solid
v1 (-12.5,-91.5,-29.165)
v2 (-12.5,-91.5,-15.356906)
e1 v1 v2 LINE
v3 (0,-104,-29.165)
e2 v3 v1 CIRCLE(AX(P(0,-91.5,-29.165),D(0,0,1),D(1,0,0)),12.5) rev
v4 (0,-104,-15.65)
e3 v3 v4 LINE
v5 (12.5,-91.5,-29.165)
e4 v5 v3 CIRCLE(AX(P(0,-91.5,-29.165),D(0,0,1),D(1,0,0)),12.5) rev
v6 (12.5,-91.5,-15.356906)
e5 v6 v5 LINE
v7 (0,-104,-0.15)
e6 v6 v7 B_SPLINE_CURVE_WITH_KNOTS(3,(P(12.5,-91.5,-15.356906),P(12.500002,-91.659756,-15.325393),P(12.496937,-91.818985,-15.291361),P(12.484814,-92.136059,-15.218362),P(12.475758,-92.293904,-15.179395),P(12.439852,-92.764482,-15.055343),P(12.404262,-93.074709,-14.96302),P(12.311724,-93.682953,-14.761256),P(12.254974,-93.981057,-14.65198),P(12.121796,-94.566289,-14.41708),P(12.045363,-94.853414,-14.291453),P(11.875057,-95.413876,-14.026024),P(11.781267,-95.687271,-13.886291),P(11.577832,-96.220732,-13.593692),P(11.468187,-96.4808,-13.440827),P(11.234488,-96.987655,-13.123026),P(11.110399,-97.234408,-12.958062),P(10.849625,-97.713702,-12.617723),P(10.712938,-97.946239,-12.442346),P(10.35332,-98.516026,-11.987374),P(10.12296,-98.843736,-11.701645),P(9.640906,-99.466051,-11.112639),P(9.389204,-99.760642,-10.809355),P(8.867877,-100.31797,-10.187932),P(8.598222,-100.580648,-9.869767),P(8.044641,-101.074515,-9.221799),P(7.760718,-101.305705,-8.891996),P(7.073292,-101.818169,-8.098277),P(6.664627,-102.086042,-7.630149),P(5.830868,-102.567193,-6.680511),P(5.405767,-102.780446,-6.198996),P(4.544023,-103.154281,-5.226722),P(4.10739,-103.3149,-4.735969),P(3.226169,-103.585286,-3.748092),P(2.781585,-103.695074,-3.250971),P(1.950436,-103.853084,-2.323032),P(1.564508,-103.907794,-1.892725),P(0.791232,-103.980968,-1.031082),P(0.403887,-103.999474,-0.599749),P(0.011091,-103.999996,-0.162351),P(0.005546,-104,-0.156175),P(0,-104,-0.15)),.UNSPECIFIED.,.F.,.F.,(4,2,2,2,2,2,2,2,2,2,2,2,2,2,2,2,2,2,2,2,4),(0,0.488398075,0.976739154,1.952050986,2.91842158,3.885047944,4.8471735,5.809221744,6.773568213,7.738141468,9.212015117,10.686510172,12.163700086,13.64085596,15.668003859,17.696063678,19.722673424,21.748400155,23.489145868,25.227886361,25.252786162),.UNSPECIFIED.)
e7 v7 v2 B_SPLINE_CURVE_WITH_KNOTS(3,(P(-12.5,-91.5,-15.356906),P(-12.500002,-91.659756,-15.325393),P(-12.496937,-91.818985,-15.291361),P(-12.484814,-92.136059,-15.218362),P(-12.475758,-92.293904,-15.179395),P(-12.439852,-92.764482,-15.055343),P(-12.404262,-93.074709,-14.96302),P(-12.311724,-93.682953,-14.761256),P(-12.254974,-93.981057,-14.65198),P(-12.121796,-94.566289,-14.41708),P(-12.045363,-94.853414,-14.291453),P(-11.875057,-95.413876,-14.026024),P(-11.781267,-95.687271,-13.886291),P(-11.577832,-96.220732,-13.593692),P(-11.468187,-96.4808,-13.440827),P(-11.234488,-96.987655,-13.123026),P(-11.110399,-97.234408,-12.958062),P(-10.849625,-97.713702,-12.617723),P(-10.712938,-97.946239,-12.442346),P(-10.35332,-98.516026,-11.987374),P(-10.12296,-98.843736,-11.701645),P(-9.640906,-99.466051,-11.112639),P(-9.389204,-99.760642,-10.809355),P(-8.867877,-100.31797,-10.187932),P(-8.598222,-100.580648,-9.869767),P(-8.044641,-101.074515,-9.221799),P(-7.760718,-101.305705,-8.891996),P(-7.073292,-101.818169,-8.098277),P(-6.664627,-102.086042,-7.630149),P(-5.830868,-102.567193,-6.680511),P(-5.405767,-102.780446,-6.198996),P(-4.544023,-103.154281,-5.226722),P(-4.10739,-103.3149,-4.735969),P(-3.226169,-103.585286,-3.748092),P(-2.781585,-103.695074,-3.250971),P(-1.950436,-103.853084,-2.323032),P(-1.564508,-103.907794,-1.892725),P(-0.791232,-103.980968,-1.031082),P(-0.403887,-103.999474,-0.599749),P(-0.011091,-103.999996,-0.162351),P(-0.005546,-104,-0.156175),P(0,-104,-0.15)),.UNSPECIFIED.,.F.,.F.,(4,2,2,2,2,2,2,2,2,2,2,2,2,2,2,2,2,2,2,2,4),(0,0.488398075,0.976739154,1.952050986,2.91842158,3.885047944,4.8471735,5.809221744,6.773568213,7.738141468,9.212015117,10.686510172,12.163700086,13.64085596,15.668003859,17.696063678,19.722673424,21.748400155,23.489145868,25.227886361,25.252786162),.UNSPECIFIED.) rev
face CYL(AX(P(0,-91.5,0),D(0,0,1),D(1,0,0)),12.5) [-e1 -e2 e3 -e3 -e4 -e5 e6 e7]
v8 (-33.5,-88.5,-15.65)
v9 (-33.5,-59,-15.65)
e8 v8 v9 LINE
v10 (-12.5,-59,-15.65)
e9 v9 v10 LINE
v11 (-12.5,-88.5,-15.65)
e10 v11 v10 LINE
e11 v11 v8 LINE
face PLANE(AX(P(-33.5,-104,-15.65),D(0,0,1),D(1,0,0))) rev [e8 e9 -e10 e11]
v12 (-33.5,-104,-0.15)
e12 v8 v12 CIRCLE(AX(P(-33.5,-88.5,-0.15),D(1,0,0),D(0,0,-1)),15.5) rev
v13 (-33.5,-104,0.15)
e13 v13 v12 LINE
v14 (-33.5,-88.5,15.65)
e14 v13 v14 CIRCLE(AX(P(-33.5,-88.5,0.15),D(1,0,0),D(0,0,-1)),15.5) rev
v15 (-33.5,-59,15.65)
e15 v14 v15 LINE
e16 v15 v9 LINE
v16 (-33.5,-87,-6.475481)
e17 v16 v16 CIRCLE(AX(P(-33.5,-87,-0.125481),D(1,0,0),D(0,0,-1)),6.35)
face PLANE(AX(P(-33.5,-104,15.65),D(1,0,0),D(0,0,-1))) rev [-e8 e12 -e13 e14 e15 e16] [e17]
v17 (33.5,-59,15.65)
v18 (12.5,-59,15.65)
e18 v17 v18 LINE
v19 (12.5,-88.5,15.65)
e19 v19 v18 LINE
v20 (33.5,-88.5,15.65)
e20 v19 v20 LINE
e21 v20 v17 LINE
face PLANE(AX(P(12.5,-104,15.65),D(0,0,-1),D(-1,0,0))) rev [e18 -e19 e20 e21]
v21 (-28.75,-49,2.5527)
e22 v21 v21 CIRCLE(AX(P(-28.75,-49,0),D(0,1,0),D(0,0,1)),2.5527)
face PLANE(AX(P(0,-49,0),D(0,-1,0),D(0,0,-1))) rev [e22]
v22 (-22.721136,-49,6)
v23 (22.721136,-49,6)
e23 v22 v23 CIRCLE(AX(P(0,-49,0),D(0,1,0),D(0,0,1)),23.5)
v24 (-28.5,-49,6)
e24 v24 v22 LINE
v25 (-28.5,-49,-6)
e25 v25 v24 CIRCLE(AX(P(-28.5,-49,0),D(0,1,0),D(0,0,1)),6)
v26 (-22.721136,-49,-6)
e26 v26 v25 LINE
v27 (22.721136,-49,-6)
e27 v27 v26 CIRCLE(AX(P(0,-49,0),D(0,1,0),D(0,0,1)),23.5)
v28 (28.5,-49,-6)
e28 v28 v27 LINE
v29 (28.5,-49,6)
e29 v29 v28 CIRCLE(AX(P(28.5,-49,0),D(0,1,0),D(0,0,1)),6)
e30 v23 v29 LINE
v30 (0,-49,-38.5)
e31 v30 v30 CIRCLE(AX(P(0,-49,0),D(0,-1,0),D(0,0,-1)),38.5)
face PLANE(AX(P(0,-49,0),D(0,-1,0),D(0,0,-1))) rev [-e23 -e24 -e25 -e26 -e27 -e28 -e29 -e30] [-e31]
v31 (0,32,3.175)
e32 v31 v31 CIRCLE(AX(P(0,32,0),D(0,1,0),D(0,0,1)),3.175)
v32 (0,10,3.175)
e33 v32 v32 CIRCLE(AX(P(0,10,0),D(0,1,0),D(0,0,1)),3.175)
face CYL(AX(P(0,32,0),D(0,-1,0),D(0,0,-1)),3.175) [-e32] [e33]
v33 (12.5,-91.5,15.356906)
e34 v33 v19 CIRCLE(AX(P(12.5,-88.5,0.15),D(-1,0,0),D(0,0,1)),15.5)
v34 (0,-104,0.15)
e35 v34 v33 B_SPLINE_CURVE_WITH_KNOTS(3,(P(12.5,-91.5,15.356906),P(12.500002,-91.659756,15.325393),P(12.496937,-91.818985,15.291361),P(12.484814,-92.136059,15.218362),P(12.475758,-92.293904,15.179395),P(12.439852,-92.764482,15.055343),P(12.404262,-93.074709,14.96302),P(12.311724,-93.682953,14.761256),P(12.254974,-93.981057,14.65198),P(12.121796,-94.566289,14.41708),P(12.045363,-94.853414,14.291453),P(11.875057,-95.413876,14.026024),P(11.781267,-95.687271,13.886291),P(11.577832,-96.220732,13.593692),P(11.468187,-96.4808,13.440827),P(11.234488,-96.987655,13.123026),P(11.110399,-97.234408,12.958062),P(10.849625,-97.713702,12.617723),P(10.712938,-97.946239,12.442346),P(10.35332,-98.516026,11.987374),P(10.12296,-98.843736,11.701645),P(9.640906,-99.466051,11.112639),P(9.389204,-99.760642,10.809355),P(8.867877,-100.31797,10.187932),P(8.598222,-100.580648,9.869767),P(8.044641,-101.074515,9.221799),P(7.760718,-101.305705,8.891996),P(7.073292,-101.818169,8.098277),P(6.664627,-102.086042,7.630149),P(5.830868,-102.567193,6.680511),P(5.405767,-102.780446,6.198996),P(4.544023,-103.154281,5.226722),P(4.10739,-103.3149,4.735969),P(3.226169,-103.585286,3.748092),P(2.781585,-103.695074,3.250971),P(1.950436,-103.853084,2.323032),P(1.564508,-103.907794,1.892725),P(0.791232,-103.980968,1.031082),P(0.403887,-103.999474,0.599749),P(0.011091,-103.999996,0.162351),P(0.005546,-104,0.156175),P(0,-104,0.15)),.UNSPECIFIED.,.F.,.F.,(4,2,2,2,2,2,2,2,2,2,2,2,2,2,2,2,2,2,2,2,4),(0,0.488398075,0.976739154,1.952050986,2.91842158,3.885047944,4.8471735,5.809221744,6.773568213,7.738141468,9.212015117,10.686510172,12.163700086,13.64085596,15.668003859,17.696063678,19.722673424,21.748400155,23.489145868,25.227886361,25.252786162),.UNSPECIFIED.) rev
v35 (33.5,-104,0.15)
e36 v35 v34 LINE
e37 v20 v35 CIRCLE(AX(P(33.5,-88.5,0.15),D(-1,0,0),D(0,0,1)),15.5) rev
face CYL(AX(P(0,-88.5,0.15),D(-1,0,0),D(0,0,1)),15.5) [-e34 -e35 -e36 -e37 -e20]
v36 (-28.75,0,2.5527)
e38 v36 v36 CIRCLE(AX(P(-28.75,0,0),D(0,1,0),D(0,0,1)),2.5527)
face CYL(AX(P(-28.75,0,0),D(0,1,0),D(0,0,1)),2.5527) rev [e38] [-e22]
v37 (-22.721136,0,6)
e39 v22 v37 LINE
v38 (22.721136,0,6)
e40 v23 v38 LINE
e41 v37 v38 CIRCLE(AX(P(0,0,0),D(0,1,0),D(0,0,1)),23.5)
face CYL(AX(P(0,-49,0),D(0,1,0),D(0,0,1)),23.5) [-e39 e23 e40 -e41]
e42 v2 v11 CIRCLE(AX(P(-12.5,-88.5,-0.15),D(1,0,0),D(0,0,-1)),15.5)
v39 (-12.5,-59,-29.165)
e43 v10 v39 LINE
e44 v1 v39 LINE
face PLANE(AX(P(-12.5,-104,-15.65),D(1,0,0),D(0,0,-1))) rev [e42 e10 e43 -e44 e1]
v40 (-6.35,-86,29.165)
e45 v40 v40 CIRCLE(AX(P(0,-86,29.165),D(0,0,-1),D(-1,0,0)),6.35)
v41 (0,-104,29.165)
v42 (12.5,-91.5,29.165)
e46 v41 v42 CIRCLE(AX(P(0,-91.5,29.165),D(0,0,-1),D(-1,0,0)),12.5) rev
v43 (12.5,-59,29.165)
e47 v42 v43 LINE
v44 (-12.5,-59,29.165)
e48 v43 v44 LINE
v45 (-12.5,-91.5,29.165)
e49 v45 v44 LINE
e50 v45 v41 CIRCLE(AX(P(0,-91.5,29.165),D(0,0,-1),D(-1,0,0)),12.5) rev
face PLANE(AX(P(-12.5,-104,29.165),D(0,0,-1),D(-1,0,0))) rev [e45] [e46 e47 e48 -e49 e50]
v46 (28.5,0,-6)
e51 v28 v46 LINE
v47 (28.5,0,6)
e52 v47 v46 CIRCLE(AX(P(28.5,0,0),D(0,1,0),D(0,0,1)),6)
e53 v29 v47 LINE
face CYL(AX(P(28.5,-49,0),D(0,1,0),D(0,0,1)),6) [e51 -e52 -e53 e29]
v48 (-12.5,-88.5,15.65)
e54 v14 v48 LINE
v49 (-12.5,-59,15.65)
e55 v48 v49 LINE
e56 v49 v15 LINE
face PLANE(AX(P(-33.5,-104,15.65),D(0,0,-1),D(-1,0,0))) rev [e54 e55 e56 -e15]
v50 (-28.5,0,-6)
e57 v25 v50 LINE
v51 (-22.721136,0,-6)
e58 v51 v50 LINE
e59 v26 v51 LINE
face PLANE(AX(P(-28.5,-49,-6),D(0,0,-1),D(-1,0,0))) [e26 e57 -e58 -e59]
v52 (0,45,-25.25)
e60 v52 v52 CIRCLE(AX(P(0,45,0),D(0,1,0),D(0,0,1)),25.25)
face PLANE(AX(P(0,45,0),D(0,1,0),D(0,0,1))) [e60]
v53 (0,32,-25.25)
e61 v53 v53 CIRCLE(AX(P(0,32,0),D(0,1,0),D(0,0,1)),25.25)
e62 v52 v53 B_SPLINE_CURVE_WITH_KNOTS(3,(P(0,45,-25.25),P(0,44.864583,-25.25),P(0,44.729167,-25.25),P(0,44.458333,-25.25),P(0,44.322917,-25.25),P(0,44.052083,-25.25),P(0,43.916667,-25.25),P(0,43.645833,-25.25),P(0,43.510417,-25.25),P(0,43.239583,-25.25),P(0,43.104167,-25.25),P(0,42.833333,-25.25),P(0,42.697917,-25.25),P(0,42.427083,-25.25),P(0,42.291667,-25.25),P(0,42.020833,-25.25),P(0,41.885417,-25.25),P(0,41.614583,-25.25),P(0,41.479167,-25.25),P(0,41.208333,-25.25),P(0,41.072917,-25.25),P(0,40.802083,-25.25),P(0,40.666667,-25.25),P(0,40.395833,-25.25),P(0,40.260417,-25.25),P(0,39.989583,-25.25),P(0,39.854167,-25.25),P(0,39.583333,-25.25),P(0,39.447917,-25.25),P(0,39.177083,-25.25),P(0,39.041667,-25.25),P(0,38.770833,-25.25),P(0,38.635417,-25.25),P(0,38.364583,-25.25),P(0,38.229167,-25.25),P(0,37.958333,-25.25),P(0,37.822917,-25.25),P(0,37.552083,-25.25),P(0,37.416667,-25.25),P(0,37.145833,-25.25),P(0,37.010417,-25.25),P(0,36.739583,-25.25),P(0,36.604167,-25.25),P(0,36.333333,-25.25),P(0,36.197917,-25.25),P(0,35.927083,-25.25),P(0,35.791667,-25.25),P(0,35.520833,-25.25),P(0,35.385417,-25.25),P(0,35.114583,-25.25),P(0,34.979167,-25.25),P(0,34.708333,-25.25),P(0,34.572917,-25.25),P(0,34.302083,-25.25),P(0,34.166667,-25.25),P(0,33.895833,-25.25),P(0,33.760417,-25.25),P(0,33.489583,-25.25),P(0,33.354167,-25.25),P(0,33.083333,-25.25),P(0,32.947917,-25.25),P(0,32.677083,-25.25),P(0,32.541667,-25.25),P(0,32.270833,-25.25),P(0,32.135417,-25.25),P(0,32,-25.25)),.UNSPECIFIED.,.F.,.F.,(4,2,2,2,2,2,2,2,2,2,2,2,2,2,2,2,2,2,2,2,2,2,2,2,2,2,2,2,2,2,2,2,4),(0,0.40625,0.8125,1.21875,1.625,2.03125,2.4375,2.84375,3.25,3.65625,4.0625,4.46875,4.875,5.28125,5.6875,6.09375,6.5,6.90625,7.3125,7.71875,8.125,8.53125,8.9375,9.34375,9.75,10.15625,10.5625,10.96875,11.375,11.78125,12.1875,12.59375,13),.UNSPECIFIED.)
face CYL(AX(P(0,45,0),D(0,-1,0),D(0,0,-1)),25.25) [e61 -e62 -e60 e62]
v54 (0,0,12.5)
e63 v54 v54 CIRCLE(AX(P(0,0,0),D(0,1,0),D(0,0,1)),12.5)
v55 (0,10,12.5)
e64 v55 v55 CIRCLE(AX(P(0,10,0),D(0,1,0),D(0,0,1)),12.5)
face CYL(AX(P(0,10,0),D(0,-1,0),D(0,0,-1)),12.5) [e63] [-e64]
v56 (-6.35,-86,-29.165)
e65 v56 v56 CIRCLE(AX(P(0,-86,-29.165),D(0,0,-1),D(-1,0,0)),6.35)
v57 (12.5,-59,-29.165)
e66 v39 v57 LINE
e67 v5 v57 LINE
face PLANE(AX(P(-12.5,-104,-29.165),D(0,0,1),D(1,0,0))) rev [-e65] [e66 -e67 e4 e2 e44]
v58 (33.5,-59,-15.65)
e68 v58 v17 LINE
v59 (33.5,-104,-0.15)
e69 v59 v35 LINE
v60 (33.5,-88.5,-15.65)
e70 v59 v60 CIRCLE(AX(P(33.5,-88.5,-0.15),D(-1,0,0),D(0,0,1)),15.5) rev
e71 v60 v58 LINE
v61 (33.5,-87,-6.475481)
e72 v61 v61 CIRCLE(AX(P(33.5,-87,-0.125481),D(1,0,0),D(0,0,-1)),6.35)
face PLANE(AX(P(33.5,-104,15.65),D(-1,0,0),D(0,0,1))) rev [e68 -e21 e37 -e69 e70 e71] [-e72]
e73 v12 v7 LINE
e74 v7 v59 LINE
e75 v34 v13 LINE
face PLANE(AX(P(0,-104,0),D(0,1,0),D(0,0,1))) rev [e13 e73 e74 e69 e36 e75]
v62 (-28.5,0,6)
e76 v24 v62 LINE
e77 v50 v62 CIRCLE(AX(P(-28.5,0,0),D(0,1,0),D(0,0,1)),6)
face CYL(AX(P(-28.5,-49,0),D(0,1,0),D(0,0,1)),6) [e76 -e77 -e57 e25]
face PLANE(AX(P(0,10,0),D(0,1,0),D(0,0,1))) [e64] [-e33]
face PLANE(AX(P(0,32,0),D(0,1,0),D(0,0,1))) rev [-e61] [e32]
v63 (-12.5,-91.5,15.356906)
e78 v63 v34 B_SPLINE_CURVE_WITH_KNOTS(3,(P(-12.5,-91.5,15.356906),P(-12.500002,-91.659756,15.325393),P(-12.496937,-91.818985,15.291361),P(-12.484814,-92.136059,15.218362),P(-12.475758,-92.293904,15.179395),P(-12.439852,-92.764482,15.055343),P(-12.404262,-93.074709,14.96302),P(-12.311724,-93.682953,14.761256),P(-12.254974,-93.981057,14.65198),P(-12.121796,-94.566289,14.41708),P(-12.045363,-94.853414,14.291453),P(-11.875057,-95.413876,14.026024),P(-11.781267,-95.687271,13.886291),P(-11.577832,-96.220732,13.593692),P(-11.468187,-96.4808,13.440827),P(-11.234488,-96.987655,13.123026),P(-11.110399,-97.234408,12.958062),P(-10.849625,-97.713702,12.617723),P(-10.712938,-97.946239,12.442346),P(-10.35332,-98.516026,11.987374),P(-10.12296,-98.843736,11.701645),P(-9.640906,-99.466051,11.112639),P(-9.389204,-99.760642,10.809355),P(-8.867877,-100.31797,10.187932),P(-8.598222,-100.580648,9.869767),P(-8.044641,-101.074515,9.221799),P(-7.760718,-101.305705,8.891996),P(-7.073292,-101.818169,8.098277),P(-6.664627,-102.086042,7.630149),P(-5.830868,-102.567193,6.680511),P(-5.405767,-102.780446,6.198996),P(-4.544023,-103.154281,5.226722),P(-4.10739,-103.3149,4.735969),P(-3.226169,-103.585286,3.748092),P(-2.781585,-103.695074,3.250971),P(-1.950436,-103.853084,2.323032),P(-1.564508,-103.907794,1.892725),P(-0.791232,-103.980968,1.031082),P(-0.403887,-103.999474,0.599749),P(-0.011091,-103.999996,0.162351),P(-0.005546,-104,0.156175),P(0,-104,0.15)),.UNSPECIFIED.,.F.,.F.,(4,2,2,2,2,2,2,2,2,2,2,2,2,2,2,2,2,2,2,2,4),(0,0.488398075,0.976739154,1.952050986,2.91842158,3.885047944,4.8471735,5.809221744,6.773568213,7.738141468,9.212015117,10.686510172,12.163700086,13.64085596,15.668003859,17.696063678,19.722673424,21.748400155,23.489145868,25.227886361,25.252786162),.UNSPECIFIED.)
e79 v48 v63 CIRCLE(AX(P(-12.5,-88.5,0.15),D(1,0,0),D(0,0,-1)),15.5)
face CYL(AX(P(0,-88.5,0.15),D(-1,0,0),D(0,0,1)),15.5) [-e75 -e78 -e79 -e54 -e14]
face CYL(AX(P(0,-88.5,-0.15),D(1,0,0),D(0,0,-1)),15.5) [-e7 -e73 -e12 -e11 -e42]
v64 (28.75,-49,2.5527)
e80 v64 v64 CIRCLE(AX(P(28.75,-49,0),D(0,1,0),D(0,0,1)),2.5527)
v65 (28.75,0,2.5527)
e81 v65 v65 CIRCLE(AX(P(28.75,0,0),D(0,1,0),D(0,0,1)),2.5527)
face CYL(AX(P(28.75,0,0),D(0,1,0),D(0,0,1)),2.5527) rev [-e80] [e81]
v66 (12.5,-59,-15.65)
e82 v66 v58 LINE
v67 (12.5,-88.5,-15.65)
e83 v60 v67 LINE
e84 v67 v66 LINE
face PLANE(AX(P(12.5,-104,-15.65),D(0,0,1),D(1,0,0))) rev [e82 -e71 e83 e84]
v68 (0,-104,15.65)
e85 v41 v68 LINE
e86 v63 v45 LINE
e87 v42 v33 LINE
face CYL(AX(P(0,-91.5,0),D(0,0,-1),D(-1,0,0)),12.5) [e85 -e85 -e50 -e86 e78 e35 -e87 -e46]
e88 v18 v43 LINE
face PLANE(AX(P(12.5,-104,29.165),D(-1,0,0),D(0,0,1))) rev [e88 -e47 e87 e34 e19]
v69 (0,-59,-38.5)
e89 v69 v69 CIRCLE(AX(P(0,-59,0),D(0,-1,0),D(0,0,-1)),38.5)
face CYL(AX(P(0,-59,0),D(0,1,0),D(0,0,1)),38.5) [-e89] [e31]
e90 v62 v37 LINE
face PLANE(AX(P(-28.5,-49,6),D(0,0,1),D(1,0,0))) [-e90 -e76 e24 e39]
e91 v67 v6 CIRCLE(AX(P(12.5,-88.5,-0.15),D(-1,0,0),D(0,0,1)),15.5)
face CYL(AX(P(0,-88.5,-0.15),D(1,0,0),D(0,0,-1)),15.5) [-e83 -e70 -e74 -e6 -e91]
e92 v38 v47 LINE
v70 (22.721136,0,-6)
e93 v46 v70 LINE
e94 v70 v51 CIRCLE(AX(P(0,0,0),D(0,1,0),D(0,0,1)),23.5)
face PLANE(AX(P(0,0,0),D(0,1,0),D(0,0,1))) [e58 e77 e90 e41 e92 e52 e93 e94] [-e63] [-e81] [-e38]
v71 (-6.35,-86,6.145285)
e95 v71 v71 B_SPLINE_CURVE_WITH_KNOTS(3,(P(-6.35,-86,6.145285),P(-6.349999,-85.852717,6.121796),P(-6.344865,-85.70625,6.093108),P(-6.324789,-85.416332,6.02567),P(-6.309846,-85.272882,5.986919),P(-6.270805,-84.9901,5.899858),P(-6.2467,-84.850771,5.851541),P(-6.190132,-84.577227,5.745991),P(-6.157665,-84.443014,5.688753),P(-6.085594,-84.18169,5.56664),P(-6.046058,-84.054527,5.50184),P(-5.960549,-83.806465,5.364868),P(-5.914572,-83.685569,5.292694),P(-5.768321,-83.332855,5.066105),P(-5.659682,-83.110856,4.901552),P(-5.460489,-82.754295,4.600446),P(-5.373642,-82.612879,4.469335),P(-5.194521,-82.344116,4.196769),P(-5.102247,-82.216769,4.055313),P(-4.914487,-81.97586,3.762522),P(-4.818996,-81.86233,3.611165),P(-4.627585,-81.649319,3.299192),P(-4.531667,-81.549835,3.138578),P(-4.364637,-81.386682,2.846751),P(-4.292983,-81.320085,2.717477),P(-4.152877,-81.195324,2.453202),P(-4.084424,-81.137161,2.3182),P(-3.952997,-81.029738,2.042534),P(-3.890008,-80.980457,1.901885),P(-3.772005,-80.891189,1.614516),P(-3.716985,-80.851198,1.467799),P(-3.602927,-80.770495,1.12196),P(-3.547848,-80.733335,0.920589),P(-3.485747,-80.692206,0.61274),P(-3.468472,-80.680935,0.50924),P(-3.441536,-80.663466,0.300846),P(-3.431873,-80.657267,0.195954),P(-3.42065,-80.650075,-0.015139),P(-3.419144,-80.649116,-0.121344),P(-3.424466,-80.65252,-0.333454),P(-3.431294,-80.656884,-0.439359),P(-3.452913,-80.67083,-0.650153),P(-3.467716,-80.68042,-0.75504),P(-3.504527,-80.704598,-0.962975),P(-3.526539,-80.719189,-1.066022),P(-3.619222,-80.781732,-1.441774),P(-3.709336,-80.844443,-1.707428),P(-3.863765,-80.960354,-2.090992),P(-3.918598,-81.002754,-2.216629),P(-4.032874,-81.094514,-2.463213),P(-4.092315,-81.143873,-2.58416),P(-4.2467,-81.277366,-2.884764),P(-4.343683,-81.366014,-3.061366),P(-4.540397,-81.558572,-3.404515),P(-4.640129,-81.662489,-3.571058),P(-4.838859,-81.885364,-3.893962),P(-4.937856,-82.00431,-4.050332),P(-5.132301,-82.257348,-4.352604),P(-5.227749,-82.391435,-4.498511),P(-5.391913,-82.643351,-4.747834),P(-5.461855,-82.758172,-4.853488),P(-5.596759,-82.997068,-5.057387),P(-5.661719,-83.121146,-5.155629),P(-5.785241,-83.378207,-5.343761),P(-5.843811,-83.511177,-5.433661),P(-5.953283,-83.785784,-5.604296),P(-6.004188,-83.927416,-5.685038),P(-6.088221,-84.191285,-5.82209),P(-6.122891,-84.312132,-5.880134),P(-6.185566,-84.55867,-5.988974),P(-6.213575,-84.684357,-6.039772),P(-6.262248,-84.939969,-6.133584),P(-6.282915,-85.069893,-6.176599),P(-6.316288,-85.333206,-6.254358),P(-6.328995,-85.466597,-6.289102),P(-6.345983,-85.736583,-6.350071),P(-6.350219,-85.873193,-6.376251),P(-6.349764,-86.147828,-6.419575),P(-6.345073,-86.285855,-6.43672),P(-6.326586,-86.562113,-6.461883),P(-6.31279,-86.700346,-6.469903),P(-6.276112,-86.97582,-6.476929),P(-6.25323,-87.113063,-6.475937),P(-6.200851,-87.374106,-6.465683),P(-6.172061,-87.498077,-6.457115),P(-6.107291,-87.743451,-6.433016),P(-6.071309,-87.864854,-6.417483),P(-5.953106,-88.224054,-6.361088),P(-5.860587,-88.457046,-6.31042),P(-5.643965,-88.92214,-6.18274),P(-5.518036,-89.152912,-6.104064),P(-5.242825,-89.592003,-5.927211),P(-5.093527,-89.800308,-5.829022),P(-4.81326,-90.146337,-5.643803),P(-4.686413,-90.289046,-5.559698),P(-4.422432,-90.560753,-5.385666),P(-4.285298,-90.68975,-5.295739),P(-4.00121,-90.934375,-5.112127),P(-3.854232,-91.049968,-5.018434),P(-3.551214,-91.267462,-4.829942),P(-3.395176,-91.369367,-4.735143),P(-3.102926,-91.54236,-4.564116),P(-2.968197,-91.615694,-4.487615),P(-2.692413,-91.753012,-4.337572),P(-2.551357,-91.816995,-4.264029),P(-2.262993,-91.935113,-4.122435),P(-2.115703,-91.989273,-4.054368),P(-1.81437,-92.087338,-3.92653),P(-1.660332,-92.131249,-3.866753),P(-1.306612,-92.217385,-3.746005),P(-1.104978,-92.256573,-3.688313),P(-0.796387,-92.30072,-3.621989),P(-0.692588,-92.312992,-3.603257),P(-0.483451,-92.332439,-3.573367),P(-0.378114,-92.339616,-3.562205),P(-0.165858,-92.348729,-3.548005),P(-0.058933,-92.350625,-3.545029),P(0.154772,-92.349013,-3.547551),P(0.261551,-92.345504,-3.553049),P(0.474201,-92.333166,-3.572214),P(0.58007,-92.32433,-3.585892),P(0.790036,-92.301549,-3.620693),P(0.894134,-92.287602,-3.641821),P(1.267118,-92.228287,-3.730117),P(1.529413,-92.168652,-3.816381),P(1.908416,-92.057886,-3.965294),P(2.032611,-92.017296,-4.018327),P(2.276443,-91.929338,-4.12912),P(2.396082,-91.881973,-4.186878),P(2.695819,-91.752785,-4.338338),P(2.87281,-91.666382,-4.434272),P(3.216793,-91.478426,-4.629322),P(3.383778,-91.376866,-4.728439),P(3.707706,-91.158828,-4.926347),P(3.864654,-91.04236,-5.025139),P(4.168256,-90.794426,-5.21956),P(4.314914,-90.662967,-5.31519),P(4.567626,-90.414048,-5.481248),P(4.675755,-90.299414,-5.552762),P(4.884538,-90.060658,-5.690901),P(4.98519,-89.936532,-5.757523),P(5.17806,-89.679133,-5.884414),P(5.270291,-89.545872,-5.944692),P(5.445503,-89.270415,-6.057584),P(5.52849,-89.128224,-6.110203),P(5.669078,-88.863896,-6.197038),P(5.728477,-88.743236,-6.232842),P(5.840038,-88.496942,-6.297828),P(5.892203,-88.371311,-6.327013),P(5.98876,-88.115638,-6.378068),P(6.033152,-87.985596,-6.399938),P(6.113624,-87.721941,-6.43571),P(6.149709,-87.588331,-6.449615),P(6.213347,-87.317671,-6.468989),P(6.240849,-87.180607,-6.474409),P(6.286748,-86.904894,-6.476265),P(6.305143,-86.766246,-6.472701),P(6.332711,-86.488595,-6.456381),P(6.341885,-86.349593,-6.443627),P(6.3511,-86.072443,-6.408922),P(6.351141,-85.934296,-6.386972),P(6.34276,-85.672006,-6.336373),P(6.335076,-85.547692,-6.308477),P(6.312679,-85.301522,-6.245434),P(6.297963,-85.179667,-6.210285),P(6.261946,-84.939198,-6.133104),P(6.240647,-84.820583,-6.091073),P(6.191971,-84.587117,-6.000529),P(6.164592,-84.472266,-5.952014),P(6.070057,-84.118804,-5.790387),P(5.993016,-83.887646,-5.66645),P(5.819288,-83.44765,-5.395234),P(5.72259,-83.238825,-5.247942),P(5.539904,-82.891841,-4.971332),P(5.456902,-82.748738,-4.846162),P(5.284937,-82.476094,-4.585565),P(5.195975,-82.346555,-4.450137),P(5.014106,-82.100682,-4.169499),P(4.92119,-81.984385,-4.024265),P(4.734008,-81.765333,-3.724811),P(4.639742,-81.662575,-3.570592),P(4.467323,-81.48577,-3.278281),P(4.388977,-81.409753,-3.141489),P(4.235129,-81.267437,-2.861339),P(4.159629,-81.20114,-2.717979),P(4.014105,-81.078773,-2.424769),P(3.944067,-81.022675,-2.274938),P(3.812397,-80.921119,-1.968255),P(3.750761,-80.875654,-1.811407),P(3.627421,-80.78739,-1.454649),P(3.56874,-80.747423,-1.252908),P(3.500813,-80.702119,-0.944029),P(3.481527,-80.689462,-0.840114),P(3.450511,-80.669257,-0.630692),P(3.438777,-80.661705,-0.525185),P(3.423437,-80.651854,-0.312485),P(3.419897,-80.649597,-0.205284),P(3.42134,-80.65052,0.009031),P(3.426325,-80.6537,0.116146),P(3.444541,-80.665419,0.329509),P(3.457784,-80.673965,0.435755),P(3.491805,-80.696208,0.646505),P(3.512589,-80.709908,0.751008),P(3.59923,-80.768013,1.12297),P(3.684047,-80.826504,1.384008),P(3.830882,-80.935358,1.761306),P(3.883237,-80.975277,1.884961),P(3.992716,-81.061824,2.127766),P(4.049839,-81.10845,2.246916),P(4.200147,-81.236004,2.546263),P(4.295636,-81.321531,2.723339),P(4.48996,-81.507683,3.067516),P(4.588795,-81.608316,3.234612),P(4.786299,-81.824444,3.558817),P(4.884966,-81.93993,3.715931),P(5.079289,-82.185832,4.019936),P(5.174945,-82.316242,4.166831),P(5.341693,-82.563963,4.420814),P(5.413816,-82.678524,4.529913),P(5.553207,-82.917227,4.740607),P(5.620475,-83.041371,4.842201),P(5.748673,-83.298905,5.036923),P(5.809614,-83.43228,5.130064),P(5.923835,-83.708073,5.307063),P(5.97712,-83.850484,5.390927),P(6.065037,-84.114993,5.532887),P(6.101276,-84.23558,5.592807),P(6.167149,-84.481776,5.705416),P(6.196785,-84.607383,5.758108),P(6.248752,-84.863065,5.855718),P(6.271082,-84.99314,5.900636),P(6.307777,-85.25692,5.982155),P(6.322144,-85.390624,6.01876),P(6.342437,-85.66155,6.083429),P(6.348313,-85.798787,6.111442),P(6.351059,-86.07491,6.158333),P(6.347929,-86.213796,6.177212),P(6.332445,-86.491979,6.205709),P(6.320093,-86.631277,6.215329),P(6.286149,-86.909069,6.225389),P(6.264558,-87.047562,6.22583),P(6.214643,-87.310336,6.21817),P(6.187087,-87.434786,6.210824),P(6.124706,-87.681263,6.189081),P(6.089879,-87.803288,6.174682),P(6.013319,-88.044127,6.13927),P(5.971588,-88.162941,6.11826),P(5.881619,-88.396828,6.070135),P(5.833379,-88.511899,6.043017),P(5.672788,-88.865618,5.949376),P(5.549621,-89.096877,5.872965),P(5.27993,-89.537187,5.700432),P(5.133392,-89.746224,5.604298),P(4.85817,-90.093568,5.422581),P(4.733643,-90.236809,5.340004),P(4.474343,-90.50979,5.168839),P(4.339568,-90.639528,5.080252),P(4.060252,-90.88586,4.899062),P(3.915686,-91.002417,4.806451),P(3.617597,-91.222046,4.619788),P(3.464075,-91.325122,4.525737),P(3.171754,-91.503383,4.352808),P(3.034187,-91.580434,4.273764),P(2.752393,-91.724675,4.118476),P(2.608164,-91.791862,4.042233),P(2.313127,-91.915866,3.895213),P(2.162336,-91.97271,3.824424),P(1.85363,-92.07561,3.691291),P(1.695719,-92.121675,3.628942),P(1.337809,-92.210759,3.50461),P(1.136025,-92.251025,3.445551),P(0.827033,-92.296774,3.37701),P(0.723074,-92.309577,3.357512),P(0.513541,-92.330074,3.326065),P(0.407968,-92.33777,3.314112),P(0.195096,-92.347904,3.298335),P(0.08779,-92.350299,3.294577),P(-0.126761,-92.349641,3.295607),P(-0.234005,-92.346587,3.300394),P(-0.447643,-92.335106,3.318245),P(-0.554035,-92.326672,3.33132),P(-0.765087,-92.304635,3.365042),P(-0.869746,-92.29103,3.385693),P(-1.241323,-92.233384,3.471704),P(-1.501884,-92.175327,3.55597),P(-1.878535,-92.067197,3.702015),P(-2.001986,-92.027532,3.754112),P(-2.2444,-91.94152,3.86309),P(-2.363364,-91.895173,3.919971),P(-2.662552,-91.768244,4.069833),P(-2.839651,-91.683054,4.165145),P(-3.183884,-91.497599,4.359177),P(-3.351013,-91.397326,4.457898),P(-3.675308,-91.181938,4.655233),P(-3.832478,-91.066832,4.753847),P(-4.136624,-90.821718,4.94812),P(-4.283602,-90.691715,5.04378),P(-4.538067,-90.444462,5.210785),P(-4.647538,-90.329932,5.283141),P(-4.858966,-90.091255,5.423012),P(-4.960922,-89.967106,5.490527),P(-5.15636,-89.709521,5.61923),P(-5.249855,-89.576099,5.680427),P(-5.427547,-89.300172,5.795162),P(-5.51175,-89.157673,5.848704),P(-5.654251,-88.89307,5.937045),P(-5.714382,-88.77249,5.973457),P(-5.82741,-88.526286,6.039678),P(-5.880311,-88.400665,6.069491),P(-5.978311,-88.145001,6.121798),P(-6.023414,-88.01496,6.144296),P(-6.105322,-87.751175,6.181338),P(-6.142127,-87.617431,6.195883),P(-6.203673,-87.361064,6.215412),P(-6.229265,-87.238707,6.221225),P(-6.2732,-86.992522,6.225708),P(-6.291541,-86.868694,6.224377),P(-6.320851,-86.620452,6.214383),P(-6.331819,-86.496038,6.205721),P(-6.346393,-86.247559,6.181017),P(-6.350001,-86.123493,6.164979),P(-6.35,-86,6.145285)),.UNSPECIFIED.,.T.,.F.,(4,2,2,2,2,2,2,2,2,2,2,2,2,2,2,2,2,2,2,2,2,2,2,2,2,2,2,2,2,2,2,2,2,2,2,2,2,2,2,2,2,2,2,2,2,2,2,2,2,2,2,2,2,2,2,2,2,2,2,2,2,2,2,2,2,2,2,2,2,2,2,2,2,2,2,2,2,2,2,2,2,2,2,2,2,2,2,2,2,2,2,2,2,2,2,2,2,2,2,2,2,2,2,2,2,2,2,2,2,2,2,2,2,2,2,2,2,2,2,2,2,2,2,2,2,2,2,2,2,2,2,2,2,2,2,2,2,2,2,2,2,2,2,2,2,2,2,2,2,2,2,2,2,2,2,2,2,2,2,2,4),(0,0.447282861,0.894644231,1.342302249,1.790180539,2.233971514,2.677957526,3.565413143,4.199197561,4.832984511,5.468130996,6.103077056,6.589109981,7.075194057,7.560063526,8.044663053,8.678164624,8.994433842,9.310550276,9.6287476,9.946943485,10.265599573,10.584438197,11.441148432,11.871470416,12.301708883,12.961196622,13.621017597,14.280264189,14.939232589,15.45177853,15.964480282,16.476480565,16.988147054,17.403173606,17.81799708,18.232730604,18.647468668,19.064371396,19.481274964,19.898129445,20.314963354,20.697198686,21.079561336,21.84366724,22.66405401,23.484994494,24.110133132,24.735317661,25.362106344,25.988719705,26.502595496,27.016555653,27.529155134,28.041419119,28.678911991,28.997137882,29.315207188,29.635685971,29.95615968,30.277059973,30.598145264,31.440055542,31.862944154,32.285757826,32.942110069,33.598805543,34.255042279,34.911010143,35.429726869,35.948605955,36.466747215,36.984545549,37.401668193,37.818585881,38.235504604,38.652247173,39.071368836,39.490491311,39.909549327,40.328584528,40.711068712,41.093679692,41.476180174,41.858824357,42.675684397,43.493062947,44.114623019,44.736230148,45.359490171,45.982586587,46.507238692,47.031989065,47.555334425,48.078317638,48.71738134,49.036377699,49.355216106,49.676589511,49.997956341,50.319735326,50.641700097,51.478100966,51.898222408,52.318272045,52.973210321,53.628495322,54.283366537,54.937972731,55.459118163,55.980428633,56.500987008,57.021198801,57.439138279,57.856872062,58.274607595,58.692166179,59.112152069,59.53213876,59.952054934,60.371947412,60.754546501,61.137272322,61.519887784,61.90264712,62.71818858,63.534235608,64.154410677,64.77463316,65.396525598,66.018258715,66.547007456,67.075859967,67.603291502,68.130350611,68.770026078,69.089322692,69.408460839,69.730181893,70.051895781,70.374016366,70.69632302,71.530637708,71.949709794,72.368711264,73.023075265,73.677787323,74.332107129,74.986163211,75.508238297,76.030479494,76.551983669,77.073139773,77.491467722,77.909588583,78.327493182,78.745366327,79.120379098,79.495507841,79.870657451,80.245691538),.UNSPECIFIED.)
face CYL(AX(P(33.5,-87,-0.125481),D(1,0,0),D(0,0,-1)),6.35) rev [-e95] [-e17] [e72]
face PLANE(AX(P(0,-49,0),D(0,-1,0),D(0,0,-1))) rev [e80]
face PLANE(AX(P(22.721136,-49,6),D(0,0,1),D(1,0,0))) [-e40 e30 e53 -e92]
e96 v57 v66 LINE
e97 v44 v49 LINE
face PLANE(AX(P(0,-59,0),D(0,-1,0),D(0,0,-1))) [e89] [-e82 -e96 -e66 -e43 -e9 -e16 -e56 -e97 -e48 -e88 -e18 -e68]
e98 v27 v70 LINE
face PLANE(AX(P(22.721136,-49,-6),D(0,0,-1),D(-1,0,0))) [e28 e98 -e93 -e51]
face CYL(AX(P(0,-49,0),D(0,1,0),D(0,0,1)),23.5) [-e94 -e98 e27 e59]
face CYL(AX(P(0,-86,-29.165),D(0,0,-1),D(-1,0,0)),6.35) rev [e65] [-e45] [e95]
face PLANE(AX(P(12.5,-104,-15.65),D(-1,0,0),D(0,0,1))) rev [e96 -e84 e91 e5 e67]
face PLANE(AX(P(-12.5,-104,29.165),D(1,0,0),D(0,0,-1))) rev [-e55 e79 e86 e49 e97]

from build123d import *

# Parameters (mm, degrees)
BOSS_EXTRUDE1_DEPTH        = 49
F_1_4_20_TAPPED_HOLE1_D    = 5.1054
SKETCH4_R                  = 38.5
BOSS_EXTRUDE2_DEPTH        = 10
BOSS_EXTRUDE3_DEPTH        = 45
FILLET1_R                  = 12.5
FILLET2_R                  = 15.5
F_1_2_0_5_DIAMETER_HOLE1_D = 12.7
F_1_2_0_5_DIAMETER_HOLE2_D = 12.7
SKETCH10_R                 = 12.5
BOSS_EXTRUDE4_DEPTH        = 10
SKETCH11_R                 = 3.175
BOSS_EXTRUDE5_DEPTH        = 22
SKETCH12_R                 = 25.25
BOSS_EXTRUDE6_DEPTH        = 13


with BuildPart() as part:
    # Sketch1 → Boss-Extrude1 (new body)
    with BuildSketch(Plane(origin=(0, 0, 0), x_dir=(1, 0, 0), z_dir=(0, 1, 0))):
        with BuildLine():
            Line((-28.5, 6), (-22.721135535, 6))
            ThreePointArc((-22.721135535, 6), (0, 23.5), (22.721135535, 6))
            Line((22.721135535, 6), (28.5, 6))
            ThreePointArc((28.5, 6), (34.5, 0), (28.5, -6))
            Line((28.5, -6), (22.721135535, -6))
            ThreePointArc((22.721135535, -6), (0, -23.5), (-22.721135535, -6))
            Line((-22.721135535, -6), (-28.5, -6))
            ThreePointArc((-28.5, -6), (-34.5, 0), (-28.5, 6))
        make_face()
    extrude(amount=-BOSS_EXTRUDE1_DEPTH)

    # 1/4-20 Tapped Hole1 (through all)
    with Locations(Plane(origin=(0, 0, 0), x_dir=(1, 0, 0), z_dir=(0, 1, 0))):
        with Locations((-28.75, 0), (28.75, 0)):
            Hole(F_1_4_20_TAPPED_HOLE1_D / 2)

    # Sketch4 → Boss-Extrude2 (add)
    with BuildSketch(Plane.XZ.offset(49)):
        with Locations(Location((0, 0, 0), (0, 0, 270))):
            Circle(SKETCH4_R)
    extrude(amount=BOSS_EXTRUDE2_DEPTH)

    # Sketch5 → Boss-Extrude3 (add)
    with BuildSketch(Plane.XZ.offset(59)):
        Polygon((12.5, 15.65), (33.5, 15.65), (33.5, -15.65), (12.5, -15.65), (12.5, -29.165), (-12.5, -29.165), (-12.5, -15.65), (-33.5, -15.65), (-33.5, 15.65), (-12.5, 15.65), (-12.5, 29.165), (12.5, 29.165), align=None)
    extrude(amount=BOSS_EXTRUDE3_DEPTH)

    # Fillet1
    fillet1_edges = [part.edges().sort_by_distance(p)[0] for p in [
        (12.5, -104, 22.4075),
        (-12.5, -104, 22.4075),
        (-12.5, -104, -22.4075),
        (12.5, -104, -22.4075),
    ]]
    fillet(fillet1_edges, radius=FILLET1_R - 0.0001)  # a hair under: the kernel refuses the full size

    # Fillet2
    fillet2_edges = [part.edges().sort_by_distance(p)[0] for p in [
        (-16.75005, -104, 15.65),
        (-16.75005, -104, -15.65),
        (16.75005, -104, 15.65),
        (16.75005, -104, -15.65),
    ]]
    fillet(fillet2_edges, radius=FILLET2_R)

    # 1/2 (0.5) Diameter Hole1 (through all)
    with Locations(Plane(origin=(0, 0, -29.165), x_dir=(-1, 0, 0), z_dir=(0, 0, -1))):
        with Locations((0, -86)):
            Hole(F_1_2_0_5_DIAMETER_HOLE1_D / 2)

    # 1/2 (0.5) Diameter Hole2 (through all)
    with Locations(Plane(origin=(33.5, 0, 0), x_dir=(0, 0, -1), z_dir=(1, 0, 0))):
        with Locations((0.125480769, -87)):
            Hole(F_1_2_0_5_DIAMETER_HOLE2_D / 2)

    # Sketch10 → Boss-Extrude4 (add)
    with BuildSketch(Plane(origin=(0, 0, 0), x_dir=(1, 0, 0), z_dir=(0, 1, 0))):
        with Locations(Location((0, 0, 0), (0, 0, 270))):
            Circle(SKETCH10_R)
    extrude(amount=BOSS_EXTRUDE4_DEPTH)

    # Sketch11 → Boss-Extrude5 (add)
    with BuildSketch(Plane(origin=(0, 10, 0), x_dir=(1, 0, 0), z_dir=(0, 1, 0))):
        with Locations(Location((0, 0, 0), (0, 0, 270))):
            Circle(SKETCH11_R)
    extrude(amount=BOSS_EXTRUDE5_DEPTH)

    # Sketch12 → Boss-Extrude6 (add)
    with BuildSketch(Plane(origin=(0, 32, 0), x_dir=(1, 0, 0), z_dir=(0, 1, 0))):
        with Locations(Location((0, 0, 0), (0, 0, 90))):
            Circle(SKETCH12_R)
    extrude(amount=BOSS_EXTRUDE6_DEPTH)


solid = part.part
